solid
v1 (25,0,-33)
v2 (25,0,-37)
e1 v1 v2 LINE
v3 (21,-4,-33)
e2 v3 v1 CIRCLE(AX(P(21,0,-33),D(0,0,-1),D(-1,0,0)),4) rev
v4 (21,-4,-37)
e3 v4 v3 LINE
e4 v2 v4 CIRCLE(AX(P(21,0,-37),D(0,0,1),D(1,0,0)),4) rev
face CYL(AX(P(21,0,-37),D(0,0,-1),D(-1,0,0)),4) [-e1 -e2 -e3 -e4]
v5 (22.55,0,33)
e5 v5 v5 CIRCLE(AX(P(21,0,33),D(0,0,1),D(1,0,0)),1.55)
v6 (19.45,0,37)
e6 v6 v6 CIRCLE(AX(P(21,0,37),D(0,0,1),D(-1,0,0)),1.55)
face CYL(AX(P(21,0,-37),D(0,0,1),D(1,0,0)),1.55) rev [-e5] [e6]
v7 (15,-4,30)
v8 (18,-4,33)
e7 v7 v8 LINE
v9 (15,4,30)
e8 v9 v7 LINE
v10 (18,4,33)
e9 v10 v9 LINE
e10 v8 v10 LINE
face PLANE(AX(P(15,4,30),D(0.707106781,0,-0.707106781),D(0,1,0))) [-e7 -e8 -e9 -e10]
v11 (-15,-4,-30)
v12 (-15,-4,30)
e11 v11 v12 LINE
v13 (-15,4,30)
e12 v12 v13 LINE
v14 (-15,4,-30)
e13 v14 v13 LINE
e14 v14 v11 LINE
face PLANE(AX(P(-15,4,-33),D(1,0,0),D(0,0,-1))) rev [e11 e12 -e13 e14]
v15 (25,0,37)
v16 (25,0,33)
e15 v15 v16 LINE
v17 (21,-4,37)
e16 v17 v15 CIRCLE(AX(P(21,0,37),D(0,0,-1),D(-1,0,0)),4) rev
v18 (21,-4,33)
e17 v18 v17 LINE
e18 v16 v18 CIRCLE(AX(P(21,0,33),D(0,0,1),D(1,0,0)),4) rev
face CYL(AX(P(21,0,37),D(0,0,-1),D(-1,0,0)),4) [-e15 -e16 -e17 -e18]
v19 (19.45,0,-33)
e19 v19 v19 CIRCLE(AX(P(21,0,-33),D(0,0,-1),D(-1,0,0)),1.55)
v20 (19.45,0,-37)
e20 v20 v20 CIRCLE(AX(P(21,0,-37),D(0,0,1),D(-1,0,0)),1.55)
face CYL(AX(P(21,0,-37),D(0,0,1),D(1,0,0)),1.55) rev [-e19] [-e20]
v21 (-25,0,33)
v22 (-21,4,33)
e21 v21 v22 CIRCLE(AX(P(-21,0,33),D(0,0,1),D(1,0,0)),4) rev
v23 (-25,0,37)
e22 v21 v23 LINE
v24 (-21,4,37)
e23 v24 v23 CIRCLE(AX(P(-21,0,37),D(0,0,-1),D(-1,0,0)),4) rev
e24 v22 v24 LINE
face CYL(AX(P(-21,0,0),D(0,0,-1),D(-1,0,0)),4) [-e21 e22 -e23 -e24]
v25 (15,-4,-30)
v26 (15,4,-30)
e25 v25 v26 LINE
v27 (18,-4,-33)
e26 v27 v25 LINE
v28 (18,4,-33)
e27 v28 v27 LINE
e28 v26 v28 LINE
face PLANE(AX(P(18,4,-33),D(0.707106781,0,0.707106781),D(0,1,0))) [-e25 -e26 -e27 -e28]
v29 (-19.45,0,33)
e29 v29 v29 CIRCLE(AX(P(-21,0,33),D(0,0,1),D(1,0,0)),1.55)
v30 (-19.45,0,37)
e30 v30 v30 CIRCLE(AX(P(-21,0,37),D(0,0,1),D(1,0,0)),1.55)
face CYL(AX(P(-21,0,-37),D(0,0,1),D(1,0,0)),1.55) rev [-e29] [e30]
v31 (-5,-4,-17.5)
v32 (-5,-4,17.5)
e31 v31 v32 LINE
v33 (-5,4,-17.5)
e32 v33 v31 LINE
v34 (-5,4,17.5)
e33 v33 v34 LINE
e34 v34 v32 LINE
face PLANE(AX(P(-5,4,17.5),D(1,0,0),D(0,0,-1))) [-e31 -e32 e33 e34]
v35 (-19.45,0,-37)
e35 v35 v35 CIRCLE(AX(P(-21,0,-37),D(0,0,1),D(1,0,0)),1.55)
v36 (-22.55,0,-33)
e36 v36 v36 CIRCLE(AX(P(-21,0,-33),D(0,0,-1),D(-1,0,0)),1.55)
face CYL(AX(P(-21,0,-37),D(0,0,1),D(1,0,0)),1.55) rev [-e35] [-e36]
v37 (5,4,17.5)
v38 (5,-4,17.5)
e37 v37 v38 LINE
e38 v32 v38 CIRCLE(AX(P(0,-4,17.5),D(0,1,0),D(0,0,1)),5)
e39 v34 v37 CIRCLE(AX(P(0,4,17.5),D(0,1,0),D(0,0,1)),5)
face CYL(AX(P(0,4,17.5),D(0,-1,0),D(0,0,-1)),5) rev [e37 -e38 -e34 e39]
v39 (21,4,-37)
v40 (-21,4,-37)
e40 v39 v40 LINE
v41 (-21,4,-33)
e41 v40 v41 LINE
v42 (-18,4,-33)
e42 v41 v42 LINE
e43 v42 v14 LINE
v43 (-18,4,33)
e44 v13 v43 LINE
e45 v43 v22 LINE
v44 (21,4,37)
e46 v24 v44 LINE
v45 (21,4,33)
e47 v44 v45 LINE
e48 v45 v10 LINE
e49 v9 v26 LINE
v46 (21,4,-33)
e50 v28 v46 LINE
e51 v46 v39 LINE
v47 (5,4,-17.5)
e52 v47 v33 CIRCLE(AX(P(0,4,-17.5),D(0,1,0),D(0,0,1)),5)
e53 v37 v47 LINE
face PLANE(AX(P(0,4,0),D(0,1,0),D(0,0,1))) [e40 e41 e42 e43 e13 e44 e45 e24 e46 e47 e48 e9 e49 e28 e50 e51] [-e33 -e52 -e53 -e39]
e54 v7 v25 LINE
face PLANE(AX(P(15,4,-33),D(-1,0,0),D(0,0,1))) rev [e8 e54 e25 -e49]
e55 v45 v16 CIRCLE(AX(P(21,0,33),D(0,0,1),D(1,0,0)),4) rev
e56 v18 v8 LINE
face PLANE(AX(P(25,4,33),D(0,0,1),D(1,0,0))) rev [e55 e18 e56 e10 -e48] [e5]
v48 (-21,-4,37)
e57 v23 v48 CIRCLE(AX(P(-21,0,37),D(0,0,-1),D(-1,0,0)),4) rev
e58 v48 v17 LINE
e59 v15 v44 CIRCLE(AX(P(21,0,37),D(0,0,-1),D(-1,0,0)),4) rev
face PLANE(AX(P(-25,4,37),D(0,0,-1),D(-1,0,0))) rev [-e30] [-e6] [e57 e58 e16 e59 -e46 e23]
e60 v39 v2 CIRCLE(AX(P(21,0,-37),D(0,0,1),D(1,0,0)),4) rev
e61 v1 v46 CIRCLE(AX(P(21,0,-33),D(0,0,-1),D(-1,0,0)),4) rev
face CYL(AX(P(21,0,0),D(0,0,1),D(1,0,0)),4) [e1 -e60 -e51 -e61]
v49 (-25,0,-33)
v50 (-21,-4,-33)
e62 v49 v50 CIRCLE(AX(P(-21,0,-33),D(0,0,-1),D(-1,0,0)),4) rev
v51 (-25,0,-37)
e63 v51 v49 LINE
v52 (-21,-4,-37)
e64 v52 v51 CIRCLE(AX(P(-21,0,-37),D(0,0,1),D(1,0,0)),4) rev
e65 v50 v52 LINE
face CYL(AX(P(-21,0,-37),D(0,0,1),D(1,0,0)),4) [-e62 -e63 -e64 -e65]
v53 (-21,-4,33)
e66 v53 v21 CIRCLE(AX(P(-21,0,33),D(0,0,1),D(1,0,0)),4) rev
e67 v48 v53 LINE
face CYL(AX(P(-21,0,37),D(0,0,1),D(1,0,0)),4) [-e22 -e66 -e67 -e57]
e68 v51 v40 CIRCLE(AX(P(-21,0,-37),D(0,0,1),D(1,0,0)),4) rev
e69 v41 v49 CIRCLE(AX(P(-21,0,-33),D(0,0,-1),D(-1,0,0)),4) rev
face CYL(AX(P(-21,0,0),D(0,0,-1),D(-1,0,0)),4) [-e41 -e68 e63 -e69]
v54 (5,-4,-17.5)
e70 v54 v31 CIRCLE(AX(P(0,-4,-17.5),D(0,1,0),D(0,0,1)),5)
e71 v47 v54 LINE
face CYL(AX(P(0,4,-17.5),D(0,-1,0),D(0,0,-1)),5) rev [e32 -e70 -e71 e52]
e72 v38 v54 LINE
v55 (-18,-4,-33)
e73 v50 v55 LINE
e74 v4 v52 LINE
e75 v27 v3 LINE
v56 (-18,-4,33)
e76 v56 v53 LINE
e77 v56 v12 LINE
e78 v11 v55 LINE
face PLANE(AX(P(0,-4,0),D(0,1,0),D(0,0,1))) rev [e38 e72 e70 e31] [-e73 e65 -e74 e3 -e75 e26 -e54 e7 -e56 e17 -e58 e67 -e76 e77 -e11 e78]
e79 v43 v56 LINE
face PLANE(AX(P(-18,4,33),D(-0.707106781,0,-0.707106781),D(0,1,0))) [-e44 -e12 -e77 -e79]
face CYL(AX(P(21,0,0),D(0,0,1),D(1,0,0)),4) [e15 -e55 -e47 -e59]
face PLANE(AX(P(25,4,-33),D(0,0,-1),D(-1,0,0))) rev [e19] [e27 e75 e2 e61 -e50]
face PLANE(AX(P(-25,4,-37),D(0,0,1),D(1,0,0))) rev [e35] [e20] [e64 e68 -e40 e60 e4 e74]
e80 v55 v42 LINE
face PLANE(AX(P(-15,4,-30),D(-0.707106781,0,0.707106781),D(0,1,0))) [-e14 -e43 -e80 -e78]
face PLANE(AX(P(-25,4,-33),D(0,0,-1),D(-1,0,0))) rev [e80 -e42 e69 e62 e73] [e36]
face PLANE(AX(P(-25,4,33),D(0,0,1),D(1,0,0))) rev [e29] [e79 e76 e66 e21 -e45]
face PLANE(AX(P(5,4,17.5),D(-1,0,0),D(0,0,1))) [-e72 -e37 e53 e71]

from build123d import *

# Parameters (mm, degrees)
BOSS_EXTRUDE1_DEPTH     = 4
CHAMFER1_SIZE           = 3
CUT_EXTRUDE1_DEPTH      = 45.833023543
CUT_EXTRUDE1_DEPTH_BACK = 45.833023543
SKETCH3_R               = 1.55
FILLET1_R               = 4


with BuildPart() as part:
    # Sketch1 → Boss-Extrude1 (new, symmetric)
    with BuildSketch(Plane(origin=(0, 0, 0), x_dir=(1, 0, 0), z_dir=(0, 1, 0))):
        Polygon((-25, 37), (25, 37), (25, 33), (15, 33), (15, -33), (25, -33), (25, -37), (-25, -37), (-25, -33), (-15, -33), (-15, 33), (-25, 33), align=None)
        with BuildLine():
            Line((-5, -17.5), (-5, 17.5))
            ThreePointArc((-5, 17.5), (0, 22.5), (5, 17.5))
            Line((5, 17.5), (5, -17.5))
            ThreePointArc((5, -17.5), (0, -22.5), (-5, -17.5))
        make_face(mode=Mode.SUBTRACT)
    extrude(amount=BOSS_EXTRUDE1_DEPTH, both=True)

    # Chamfer1
    chamfer1_edges = [part.edges().sort_by_distance(p)[0] for p in [
        (-15, 0, 33),
        (-15, 0, -33),
        (15, 0, -33),
        (15, 0, 33),
    ]]
    chamfer(chamfer1_edges, length=CHAMFER1_SIZE)

    # Sketch3 → Cut-Extrude1 (cut, two sides: drawn at the far end of the back side and taken through both)
    with BuildSketch(Plane.XY.offset(-CUT_EXTRUDE1_DEPTH_BACK)):
        with Locations((-21, 0)):
            Circle(SKETCH3_R)
        with Locations(Location((21, 0, 0), (0, 0, 180))):
            Circle(SKETCH3_R)
    extrude(amount=CUT_EXTRUDE1_DEPTH + CUT_EXTRUDE1_DEPTH_BACK, mode=Mode.SUBTRACT)

    # Fillet1
    fillet1_edges = [part.edges().sort_by_distance(p)[0] for p in [
        (25, -4, 35),
        (-25, -4, 35),
        (-25, 4, 35),
        (25, 4, 35),
        (25, -4, -35),
        (25, 4, -35),
        (-25, -4, -35),
        (-25, 4, -35),
    ]]
    fillet(fillet1_edges, radius=FILLET1_R - 0.0001)  # a hair under: the kernel refuses the full size


solid = part.part
